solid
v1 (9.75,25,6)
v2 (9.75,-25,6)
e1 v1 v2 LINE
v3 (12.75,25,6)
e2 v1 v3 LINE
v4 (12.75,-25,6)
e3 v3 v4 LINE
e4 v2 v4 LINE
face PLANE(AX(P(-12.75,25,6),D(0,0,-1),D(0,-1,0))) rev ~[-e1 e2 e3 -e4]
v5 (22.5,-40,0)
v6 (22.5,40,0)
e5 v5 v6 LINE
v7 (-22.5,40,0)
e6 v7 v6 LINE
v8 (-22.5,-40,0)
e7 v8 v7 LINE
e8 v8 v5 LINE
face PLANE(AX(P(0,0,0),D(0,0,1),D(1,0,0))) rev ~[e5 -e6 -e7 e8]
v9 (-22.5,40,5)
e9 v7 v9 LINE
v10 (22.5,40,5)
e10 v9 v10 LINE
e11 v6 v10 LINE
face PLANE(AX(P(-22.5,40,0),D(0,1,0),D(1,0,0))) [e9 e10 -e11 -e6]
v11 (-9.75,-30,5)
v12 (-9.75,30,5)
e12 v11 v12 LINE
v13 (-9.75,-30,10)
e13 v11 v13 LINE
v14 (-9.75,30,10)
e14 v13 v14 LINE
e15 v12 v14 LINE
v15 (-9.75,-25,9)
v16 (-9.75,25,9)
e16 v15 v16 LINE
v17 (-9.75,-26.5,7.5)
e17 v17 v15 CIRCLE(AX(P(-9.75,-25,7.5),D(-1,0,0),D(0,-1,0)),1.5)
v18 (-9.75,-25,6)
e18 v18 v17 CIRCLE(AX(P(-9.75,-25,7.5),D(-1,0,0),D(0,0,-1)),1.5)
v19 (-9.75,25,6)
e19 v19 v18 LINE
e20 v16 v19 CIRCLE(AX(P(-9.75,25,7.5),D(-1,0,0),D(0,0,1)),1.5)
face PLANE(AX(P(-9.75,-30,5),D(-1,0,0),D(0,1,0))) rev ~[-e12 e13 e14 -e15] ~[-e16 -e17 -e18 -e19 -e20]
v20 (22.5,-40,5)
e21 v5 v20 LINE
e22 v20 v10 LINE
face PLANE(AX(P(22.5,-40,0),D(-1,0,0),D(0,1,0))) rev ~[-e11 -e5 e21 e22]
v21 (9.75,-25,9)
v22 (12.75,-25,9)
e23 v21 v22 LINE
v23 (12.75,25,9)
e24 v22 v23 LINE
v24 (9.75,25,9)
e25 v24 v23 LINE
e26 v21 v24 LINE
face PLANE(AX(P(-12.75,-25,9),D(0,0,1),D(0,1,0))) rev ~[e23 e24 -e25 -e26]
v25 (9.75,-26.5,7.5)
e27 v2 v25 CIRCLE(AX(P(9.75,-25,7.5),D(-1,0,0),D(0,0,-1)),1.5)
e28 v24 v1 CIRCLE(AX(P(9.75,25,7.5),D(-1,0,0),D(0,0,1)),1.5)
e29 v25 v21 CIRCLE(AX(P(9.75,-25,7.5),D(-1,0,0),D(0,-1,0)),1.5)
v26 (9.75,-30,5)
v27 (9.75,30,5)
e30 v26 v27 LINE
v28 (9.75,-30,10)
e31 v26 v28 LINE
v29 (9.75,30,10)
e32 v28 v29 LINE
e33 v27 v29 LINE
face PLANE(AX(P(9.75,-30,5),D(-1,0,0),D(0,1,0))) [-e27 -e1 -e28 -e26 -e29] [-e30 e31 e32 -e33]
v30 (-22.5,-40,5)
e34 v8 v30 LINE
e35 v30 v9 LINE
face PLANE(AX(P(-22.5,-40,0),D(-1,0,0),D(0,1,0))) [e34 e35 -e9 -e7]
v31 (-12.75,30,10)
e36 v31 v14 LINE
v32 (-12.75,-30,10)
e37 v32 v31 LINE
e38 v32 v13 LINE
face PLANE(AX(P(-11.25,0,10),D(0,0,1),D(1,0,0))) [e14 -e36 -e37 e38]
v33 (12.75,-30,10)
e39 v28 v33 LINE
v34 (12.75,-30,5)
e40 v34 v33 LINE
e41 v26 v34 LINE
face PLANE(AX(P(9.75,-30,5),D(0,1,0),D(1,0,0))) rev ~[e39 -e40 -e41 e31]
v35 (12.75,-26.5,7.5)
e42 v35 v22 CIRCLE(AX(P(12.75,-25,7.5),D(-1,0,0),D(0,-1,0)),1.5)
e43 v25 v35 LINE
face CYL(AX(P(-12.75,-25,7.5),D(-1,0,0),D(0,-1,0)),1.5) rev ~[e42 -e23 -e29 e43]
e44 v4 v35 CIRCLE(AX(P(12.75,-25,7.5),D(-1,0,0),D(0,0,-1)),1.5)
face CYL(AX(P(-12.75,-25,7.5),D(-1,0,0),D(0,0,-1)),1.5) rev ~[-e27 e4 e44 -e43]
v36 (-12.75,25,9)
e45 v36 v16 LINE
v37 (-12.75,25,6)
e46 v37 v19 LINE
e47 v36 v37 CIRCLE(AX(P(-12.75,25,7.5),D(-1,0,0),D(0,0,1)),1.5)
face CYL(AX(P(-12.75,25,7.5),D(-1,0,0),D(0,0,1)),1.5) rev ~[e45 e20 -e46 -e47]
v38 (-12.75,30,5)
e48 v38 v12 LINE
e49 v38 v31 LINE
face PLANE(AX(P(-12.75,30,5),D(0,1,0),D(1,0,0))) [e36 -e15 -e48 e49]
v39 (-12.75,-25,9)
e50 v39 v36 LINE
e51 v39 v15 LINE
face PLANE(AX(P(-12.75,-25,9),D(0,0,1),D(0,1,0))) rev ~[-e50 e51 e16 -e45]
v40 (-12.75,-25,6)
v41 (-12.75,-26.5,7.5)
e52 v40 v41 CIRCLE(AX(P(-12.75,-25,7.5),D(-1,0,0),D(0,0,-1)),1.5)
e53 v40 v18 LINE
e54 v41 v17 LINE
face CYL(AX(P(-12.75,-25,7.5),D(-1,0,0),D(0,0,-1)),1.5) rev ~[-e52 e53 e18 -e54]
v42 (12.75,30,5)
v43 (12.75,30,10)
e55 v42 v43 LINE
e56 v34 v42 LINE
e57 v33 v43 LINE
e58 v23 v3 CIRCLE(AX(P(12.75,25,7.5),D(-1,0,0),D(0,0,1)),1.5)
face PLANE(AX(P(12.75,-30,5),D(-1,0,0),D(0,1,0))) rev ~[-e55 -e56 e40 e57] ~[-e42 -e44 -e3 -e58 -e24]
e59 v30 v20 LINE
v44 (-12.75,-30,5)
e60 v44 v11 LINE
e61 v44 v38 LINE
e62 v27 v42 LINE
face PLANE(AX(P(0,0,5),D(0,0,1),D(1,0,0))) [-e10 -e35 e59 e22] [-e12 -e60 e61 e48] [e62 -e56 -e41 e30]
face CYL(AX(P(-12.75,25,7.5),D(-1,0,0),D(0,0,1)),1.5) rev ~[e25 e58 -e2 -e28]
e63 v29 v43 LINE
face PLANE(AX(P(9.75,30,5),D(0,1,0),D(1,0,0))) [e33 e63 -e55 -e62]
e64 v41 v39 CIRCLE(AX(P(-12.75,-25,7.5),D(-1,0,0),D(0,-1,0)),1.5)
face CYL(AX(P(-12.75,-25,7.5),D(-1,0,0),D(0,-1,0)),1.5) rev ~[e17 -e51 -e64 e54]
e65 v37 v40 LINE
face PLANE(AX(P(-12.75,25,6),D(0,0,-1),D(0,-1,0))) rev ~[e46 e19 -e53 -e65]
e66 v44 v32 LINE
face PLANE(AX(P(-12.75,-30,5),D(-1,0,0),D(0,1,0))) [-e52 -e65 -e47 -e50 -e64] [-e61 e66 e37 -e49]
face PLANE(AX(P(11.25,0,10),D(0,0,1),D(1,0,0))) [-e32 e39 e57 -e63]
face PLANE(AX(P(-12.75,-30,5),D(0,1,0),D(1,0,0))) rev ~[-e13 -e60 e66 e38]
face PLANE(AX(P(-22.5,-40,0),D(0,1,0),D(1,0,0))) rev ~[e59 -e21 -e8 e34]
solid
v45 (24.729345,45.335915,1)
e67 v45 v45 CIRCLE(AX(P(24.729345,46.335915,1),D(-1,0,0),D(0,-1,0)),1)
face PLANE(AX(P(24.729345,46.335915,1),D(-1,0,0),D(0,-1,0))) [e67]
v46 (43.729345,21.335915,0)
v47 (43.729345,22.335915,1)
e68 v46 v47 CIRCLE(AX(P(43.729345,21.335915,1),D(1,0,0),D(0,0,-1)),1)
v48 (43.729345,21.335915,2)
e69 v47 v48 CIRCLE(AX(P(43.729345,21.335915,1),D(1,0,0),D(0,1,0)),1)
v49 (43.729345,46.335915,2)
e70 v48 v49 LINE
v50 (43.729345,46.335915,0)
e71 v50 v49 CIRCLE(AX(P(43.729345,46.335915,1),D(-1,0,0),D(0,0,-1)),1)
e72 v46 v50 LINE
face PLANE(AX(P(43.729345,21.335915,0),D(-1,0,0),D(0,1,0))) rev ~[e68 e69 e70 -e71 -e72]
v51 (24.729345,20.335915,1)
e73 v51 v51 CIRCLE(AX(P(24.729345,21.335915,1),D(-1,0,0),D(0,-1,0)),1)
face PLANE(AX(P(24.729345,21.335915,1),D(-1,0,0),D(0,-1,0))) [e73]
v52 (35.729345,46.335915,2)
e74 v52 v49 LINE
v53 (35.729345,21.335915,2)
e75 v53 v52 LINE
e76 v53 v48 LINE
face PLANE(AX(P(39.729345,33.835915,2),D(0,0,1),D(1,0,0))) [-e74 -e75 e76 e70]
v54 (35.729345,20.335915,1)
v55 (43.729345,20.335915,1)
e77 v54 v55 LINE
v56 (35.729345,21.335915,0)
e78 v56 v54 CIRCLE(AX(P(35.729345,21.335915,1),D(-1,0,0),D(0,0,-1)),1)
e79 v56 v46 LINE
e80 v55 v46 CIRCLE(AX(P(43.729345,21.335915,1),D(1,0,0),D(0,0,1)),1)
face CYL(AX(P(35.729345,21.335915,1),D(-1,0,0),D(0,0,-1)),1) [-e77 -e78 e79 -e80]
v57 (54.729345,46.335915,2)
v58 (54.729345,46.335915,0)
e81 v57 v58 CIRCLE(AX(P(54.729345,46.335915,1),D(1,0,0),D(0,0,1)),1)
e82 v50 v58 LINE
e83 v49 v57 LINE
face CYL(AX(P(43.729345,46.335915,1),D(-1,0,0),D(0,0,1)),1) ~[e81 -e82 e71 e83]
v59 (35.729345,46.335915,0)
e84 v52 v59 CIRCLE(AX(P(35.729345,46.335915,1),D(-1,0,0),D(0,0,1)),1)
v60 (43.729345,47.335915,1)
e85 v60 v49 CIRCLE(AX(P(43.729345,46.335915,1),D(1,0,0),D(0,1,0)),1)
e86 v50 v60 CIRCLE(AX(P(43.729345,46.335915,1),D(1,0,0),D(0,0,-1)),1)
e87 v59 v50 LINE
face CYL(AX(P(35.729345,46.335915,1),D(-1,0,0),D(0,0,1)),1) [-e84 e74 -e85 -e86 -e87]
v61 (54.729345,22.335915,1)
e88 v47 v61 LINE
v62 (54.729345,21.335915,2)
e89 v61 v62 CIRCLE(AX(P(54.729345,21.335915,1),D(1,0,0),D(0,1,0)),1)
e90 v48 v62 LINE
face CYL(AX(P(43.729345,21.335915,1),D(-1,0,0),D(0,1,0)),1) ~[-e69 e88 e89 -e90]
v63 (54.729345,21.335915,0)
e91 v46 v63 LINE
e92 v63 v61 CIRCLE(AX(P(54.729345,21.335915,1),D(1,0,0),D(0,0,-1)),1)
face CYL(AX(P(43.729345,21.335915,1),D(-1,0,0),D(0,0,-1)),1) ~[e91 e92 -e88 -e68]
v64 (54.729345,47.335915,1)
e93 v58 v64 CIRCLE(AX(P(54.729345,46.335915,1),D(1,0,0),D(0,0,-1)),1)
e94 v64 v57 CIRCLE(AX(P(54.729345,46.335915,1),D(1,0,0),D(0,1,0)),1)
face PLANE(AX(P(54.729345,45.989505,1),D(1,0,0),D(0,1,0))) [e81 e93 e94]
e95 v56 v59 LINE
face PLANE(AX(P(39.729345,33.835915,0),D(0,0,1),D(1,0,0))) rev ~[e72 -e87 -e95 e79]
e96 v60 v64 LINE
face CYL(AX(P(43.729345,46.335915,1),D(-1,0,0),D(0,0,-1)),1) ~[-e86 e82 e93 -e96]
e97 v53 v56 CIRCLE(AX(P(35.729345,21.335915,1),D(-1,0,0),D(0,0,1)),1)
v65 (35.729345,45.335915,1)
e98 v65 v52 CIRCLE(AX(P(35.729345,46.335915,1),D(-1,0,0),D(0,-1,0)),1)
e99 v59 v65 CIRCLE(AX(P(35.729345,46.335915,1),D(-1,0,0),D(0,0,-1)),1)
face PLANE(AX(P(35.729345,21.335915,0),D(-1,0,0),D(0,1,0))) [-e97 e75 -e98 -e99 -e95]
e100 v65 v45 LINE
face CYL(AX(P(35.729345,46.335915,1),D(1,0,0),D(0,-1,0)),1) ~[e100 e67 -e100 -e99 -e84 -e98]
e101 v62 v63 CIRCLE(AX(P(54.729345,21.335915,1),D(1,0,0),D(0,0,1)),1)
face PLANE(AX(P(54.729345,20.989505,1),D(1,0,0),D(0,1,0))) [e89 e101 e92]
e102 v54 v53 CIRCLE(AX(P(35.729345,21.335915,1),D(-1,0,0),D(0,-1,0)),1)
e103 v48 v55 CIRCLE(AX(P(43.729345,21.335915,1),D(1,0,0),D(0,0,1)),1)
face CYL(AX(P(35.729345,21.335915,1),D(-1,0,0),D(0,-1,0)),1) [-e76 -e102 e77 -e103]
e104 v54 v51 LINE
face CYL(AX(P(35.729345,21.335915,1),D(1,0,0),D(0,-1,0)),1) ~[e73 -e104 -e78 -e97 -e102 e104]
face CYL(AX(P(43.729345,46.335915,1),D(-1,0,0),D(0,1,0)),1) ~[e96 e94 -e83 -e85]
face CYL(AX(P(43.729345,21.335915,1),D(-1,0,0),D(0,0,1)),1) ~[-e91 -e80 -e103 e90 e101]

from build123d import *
from build123d import SkipClean  # not in build123d's __all__

# Parameters (mm, degrees)
F0_W      = 45
F0_H      = 80
F1_DEPTH  = 5
F2_W      = 3
F2_H      = 60
F3_DEPTH  = 5
F5_DEPTH  = 75.3
F6_W      = 8
F6_H      = 25
F7_DEPTH  = 2
F9_DEPTH  = 11
F11_DEPTH = 8
F10_R     = 1
F12_DEPTH = 11


with BuildPart() as f1:
    # F0 (on Top) → F1 (new body)
    with BuildSketch(Plane.XY):
        Rectangle(F0_W, F0_H)
    extrude(amount=F1_DEPTH)

    # F2 (on face) → F3 (join)
    with BuildSketch(Plane.XY.offset(5)):
        with Locations((-11.25, 0)):
            Rectangle(F2_W, F2_H)
        with Locations((11.25, 0)):
            Rectangle(F2_W, F2_H)
    extrude(amount=F3_DEPTH)

    # F4 (on face) → F5 (cut)
    with BuildSketch(Plane(origin=(-12.75, 0, 0), x_dir=(0, -1, 0), z_dir=(-1, 0, 0))):
        with BuildLine():
            ThreePointArc((-25, 6), (-23.9393398282, 6.4393398282), (-23.5, 7.5))
            ThreePointArc((-23.5, 7.5), (-23.9393398282, 8.5606601718), (-25, 9))
            ThreePointArc((-25, 9), (-26.5, 7.5), (-25, 6))
        make_face()
        with BuildLine():
            ThreePointArc((-25, 9), (-23.9393398282, 8.5606601718), (-23.5, 7.5))
            ThreePointArc((-23.5, 7.5), (-23.9393398282, 6.4393398282), (-25, 6))
            Line((-25, 6), (0, 6))
            Line((0, 6), (25, 6))
            ThreePointArc((25, 6), (23.5, 7.5), (25, 9))
            Line((25, 9), (0, 9))
            Line((0, 9), (-25, 9))
        make_face()
        with BuildLine():
            ThreePointArc((26.5, 7.5), (26.0606601718, 8.5606601718), (25, 9))
            ThreePointArc((25, 9), (23.5, 7.5), (25, 6))
            ThreePointArc((25, 6), (26.0606601718, 6.4393398282), (26.5, 7.5))
        make_face()
    extrude(amount=-F5_DEPTH, mode=Mode.SUBTRACT)


with BuildPart() as f7:
    # F6 (on Top) → F7 (new body)
    with BuildSketch(Plane.XY):
        with Locations((39.7293449342, 33.835914731)):
            Rectangle(F6_W, F6_H)
    extrude(amount=F7_DEPTH)

    # F8 (on face) → F9 (join)
    with BuildSketch(Plane.YZ.offset(43.7293449342)):
        with BuildLine():
            Line((21.335914731, 0), (21.335914731, 2))
            ThreePointArc((21.335914731, 2), (20.335914731, 1), (21.335914731, 0))
        make_face()
        with BuildLine():
            ThreePointArc((21.335914731, 0), (22.0430215122, 0.2928932188), (22.335914731, 1))
            ThreePointArc((22.335914731, 1), (22.0430215122, 1.7071067812), (21.335914731, 2))
            Line((21.335914731, 2), (21.335914731, 0))
        make_face()
        with BuildLine():
            Line((46.335914731, 0), (46.335914731, 2))
            ThreePointArc((46.335914731, 2), (45.335914731, 1), (46.335914731, 0))
        make_face()
        with BuildLine():
            ThreePointArc((47.335914731, 1), (47.0430215122, 1.7071067812), (46.335914731, 2))
            Line((46.335914731, 2), (46.335914731, 0))
            ThreePointArc((46.335914731, 0), (47.0430215122, 0.2928932188), (47.335914731, 1))
        make_face()
    extrude(amount=F9_DEPTH)

    # F10 (on face) → F11 (join, through all)
    with BuildSketch(Plane(origin=(35.7293449342, 0, 0), x_dir=(0, -1, 0), z_dir=(-1, 0, 0))):
        with BuildLine():
            ThreePointArc((-21.335914731, 0), (-20.6288079498, 0.2928932188), (-20.335914731, 1))
            ThreePointArc((-20.335914731, 1), (-20.6288079498, 1.7071067812), (-21.335914731, 2))
            Line((-21.335914731, 2), (-21.335914731, 0))
        make_face()
        with BuildLine():
            Line((-21.335914731, 0), (-21.335914731, 2))
            ThreePointArc((-21.335914731, 2), (-22.335914731, 1), (-21.335914731, 0))
        make_face()
        with BuildLine():
            Line((-46.335914731, 0), (-46.335914731, 2))
            ThreePointArc((-46.335914731, 2), (-47.335914731, 1), (-46.335914731, 0))
        make_face()
        with BuildLine():
            ThreePointArc((-45.335914731, 1), (-45.6288079498, 1.7071067812), (-46.335914731, 2))
            Line((-46.335914731, 2), (-46.335914731, 0))
            ThreePointArc((-46.335914731, 0), (-45.6288079498, 0.2928932188), (-45.335914731, 1))
        make_face()
    with SkipClean():  # cleaning this boolean's faces spoils the solid; the shape is the same uncleaned
        extrude(amount=-F11_DEPTH)

    # F10 (on face) → F12 (join)
    with BuildSketch(Plane(origin=(35.7293449342, 0, 0), x_dir=(0, -1, 0), z_dir=(-1, 0, 0))):
        with Locations((-21.335914731, 1)):
            Circle(F10_R)
        with Locations((-46.335914731, 1)):
            Circle(F10_R)
    extrude(amount=F12_DEPTH)


solid = Compound([f1.part, f7.part])
